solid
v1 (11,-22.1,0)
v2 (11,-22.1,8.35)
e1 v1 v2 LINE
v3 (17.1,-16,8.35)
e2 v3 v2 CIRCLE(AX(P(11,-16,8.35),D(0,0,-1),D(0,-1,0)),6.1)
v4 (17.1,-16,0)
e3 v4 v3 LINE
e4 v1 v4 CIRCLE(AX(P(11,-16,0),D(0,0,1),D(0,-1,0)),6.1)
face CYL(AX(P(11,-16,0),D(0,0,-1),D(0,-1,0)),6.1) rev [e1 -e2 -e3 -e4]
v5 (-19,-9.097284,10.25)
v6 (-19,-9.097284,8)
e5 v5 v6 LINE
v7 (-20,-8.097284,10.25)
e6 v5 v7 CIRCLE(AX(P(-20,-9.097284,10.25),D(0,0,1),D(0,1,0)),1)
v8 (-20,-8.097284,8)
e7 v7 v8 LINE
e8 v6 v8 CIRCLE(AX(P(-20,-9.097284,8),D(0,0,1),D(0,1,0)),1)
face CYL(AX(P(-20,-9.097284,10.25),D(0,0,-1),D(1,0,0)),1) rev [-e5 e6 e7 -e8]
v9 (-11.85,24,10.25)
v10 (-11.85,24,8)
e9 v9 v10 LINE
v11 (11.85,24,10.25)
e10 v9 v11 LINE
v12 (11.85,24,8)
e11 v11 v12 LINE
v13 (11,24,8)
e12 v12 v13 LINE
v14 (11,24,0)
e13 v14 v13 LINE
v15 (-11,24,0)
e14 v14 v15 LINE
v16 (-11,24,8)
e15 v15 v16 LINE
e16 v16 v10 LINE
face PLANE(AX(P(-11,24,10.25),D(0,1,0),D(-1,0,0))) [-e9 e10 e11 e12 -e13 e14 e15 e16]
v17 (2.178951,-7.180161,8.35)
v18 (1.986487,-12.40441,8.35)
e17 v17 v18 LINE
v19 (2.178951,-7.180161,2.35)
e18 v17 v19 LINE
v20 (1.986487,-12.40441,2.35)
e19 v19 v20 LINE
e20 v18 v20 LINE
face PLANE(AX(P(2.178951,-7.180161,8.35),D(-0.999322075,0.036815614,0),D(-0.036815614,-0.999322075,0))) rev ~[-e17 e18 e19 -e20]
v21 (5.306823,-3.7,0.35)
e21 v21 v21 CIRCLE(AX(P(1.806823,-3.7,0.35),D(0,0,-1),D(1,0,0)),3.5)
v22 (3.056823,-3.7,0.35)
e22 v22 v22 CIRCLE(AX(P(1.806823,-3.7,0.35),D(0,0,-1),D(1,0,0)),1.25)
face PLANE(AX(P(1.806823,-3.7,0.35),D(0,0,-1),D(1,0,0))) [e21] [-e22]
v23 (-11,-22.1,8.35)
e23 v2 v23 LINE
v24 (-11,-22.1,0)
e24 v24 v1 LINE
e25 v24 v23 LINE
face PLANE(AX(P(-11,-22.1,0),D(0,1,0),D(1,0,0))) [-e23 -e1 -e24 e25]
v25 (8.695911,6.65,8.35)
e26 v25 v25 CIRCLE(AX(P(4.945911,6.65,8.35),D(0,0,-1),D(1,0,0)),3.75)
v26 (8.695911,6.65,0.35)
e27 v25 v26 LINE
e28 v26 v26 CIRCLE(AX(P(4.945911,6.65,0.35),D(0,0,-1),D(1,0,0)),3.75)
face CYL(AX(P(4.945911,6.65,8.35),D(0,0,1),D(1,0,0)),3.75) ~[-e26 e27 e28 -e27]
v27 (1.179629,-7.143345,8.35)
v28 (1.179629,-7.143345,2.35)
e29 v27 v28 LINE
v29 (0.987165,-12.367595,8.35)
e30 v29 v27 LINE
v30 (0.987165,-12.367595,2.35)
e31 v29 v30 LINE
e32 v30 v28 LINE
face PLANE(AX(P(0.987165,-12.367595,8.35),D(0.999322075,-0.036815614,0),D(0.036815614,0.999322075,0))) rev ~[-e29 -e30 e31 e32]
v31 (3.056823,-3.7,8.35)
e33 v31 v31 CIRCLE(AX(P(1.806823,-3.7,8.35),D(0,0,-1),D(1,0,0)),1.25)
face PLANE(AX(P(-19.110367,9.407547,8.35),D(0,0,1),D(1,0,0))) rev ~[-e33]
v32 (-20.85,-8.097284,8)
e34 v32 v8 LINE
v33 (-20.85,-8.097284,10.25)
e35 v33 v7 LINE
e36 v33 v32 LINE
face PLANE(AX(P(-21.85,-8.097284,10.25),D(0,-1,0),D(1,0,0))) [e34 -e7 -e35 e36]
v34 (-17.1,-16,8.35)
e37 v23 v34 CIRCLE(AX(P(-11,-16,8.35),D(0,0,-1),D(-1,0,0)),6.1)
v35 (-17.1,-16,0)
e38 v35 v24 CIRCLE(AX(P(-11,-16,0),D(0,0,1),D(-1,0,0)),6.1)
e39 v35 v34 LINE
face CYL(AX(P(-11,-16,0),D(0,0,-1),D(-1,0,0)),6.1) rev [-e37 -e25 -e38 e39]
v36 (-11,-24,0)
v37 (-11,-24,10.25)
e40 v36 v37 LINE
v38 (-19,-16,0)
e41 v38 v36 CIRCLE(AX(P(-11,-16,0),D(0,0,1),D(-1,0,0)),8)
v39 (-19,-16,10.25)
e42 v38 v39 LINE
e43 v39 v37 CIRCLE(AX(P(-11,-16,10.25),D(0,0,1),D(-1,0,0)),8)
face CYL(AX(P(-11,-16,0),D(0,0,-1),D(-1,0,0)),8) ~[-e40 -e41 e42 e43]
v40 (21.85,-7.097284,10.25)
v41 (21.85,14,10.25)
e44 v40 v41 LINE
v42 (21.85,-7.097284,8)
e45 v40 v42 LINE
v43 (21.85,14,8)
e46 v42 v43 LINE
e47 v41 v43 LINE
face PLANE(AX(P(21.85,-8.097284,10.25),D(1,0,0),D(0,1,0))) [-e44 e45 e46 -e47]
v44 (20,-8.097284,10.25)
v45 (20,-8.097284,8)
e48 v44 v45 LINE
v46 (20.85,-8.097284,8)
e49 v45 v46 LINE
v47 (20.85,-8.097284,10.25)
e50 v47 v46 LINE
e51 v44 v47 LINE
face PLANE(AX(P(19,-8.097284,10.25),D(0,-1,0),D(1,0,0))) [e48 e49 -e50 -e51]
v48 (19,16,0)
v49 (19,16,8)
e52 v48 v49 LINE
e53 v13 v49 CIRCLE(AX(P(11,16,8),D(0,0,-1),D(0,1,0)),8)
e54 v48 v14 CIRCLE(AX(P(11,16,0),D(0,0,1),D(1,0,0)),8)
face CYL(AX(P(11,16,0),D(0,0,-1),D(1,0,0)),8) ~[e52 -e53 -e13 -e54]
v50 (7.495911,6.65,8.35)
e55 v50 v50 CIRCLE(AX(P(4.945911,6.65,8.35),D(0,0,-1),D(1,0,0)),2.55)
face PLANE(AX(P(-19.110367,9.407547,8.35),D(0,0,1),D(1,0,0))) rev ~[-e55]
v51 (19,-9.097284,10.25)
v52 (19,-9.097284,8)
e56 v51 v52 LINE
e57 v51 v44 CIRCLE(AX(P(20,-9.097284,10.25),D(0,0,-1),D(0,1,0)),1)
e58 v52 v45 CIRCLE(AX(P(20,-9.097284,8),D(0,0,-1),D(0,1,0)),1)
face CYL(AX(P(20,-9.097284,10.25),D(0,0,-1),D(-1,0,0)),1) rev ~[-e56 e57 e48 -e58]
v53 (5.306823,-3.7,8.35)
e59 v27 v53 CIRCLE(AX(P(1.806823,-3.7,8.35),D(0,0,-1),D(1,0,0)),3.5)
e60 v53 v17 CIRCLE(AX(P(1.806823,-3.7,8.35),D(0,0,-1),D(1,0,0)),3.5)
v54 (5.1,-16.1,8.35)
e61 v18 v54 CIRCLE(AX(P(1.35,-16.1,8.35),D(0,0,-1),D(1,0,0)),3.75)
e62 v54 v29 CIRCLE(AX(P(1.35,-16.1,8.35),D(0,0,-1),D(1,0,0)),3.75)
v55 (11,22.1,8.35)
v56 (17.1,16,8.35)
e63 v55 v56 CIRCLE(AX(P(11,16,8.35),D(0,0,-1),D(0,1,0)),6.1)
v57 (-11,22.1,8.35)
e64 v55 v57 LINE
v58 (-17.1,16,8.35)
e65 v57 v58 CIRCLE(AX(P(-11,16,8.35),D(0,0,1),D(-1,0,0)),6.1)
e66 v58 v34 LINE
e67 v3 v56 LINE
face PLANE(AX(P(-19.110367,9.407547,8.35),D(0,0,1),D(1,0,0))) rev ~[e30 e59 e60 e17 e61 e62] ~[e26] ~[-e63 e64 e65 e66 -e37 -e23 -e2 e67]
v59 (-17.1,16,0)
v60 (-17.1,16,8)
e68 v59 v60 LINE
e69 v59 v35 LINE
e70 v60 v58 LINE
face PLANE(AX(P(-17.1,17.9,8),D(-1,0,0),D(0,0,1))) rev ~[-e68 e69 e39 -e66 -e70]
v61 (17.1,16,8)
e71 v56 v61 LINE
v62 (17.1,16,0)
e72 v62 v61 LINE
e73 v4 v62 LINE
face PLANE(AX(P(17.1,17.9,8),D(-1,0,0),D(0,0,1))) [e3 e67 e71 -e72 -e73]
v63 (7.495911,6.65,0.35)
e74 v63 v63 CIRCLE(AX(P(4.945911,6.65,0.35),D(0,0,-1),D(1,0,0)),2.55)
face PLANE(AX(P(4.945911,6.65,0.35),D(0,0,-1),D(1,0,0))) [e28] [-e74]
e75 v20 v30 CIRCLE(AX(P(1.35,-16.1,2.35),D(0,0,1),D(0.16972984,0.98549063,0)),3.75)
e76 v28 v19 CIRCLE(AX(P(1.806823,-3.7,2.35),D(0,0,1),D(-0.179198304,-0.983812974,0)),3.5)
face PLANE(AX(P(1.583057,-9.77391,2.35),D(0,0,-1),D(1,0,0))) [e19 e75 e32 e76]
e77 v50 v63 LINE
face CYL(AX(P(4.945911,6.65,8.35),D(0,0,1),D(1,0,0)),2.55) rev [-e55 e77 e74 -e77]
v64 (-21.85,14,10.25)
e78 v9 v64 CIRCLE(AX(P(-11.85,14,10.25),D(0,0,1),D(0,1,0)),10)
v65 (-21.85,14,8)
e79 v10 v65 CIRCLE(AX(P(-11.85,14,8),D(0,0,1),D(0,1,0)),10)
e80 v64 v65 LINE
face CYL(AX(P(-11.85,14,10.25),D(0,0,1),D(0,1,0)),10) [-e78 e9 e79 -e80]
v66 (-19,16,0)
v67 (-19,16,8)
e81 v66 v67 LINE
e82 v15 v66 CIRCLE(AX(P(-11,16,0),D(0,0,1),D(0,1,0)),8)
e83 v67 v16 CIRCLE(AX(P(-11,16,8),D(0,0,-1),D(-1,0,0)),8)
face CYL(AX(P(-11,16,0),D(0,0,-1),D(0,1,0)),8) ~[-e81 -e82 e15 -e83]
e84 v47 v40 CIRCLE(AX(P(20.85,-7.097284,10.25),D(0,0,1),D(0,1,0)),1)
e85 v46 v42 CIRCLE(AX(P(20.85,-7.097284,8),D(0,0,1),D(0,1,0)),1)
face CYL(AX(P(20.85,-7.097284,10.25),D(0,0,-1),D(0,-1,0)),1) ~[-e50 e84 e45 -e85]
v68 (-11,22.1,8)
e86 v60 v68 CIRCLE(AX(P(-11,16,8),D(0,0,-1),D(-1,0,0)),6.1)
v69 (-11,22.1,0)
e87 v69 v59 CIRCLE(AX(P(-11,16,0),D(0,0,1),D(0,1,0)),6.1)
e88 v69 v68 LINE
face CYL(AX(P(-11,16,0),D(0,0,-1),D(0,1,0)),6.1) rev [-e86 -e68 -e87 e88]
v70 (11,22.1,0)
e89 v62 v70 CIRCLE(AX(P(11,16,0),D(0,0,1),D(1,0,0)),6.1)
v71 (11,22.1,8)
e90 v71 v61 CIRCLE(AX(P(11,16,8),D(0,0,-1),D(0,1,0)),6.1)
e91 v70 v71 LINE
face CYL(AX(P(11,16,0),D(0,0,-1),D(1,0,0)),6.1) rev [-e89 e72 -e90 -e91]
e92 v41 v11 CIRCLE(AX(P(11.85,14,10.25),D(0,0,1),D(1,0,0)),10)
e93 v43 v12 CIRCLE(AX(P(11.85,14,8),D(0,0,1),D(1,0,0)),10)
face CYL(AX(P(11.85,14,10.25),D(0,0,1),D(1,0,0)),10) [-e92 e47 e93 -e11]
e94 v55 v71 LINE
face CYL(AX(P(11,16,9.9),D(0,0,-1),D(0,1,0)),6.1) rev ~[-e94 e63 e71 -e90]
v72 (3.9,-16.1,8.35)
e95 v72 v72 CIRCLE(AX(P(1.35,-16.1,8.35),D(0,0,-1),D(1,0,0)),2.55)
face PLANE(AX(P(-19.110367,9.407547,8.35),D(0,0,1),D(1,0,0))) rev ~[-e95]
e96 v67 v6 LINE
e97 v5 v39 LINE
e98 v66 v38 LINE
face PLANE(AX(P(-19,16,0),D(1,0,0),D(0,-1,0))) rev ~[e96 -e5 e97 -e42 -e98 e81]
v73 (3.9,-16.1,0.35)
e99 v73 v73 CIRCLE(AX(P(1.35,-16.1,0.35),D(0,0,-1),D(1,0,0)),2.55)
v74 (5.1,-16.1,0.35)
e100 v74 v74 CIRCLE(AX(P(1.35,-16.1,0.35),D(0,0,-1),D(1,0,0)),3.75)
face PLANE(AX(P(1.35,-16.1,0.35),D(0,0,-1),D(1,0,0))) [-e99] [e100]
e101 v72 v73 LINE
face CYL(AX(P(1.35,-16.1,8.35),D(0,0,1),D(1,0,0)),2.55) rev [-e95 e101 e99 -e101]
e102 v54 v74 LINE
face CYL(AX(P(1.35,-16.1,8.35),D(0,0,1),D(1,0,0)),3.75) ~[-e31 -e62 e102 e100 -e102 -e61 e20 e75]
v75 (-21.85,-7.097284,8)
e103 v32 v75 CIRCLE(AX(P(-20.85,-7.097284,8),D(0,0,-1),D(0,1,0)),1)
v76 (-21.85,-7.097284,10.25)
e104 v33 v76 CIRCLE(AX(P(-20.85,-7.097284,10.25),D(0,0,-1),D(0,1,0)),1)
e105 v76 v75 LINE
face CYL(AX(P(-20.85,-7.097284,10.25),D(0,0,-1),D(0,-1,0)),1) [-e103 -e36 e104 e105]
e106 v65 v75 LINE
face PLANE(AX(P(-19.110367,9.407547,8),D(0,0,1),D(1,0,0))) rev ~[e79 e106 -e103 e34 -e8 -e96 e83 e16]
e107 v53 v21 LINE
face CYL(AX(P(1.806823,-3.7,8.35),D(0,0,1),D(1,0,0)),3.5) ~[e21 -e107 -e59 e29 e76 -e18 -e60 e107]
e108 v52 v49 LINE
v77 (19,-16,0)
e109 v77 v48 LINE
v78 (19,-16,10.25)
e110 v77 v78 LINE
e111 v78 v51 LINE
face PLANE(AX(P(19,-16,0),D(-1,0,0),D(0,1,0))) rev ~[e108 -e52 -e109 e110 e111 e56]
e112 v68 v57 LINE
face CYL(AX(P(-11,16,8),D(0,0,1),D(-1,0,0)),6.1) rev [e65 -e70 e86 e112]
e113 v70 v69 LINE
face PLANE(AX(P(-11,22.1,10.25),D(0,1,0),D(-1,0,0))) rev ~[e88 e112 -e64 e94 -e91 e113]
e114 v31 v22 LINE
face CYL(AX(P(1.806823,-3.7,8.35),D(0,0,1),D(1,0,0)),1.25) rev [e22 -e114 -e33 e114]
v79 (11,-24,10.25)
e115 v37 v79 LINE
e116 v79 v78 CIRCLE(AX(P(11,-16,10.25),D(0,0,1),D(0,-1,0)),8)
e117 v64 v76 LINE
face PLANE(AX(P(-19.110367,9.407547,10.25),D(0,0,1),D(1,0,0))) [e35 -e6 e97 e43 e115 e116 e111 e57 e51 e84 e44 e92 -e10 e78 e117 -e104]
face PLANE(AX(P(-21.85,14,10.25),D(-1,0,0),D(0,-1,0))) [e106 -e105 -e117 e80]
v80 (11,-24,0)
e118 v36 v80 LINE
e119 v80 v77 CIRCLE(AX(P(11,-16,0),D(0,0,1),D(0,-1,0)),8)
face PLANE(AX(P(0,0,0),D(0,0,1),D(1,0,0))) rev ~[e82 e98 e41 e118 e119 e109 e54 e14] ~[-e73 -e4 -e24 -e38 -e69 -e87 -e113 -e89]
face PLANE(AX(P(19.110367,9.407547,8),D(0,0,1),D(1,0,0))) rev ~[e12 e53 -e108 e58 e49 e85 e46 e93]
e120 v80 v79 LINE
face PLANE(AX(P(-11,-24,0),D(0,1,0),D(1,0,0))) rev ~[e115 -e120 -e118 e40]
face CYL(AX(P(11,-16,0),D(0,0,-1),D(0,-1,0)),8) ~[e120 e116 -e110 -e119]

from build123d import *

# Parameters (mm, degrees)
F1_DEPTH     = 10.25
F3_DEPTH     = 2.25
F4_R         = 1
F5_T         = 1.9
F5_T3_DEPTH  = 4.8
F5_T5_DEPTH  = 27.8972844735
F5_T8_ANGLE  = 90.000000001
F5_T10_ANGLE = 90.000000001
F6_R         = 3.75
F6_R_2       = 2.55
F7_DEPTH     = 8
F8_R         = 3.5
F8_R_2       = 1.25
F9_DEPTH     = 8
F10_R        = 3.75
F10_R_2      = 2.55
F11_DEPTH    = 8
F13_DEPTH    = 6


# Not quite as in the source:
# - a shell that OpenCascade refuses in one call is made with other operations: the cavity is built on its own and cut out


with BuildPart() as f1:
    # F0 (on Top) → F1 (new body)
    with BuildSketch(Plane.XY):
        with BuildLine():
            Line((11, 24), (-11, 24))
            ThreePointArc((-11, 24), (-16.6568542495, 21.6568542495), (-19, 16))
            Line((-19, 16), (-19, -16))
            ThreePointArc((-19, -16), (-16.6568542495, -21.6568542495), (-11, -24))
            Line((-11, -24), (11, -24))
            ThreePointArc((11, -24), (16.6568542495, -21.6568542495), (19, -16))
            Line((19, -16), (19, 16))
            ThreePointArc((19, 16), (16.6568542495, 21.6568542495), (11, 24))
        make_face()
    extrude(amount=F1_DEPTH)

    # F2 (on face) → F3 (join)
    with BuildSketch(Plane.XY.offset(10.25)):
        with BuildLine():
            ThreePointArc((-19, 16), (-16.6568542495, 21.6568542495), (-11, 24))
            Line((-11, 24), (-11.85, 24))
            ThreePointArc((-11.85, 24), (-18.9210678119, 21.0710678119), (-21.85, 14))
            Line((-21.85, 14), (-21.85, -8.0972844735))
            Line((-21.85, -8.0972844735), (-19, -8.0972844735))
            Line((-19, -8.0972844735), (-19, 16))
        make_face()
        with BuildLine():
            Line((21.85, -5.7972865179), (21.85, 14))
            ThreePointArc((21.85, 14), (18.9210678119, 21.0710678119), (11.85, 24))
            Line((11.85, 24), (11, 24))
            ThreePointArc((11, 24), (16.6568542495, 21.6568542495), (19, 16))
            Line((19, 16), (19, -8.0972844735))
            Line((19, -8.0972844735), (21.85, -8.0972844735))
            Line((21.85, -8.0972844735), (21.85, -5.7972865179))
        make_face()
    extrude(amount=-F3_DEPTH)

    # F4
    f4_edges = [f1.edges().sort_by_distance(p)[0] for p in [
        (21.85, -8.097284, 9.125),
        (19, -8.097284, 9.125),
        (-21.85, -8.097284, 9.125),
        (-19, -8.097284, 9.125),
    ]]
    fillet(f4_edges, radius=F4_R)

    # F5: shell of thickness 1.9, made by hand


with BuildPart() as f5_core1:
    # F5_t2: copy of F1
    add(f1.part)

    # the walls: a layer under each face that stays
    f5_faces = [f5_core1.faces().sort_by_distance(p)[0] for p in [
        (19, 0, 5.125),
        (0, 0, 10.25),
        (19.2928932188, -8.3901776923, 9.125),
        (16.6568542495, -21.6568542495, 5.125),
        (20.0416666667, -3.5810703946, 8),
        (16.6568542495, 21.6568542495, 4),
        (-21.85, 3.4513577633, 9.125),
        (-18.9210678119, 21.0710678119, 9.125),
        (-20.425, -8.0972844735, 9.125),
        (0, 24, 5.125),
        (-19.2928932188, -8.3901776923, 9.125),
        (18.9210678119, 21.0710678119, 9.125),
        (-19, 0, 5.125),
        (21.85, 3.4513577633, 9.125),
        (-16.6568542495, -21.6568542495, 5.125),
        (0, -24, 5.125),
        (20.425, -8.0972844735, 9.125),
        (-16.6568542495, 21.6568542495, 4),
        (-20.0416666667, -3.5810703946, 8),
    ]]
    thicken(f5_faces, amount=-F5_T, mode=Mode.SUBTRACT)

    # F5_s4 → F5_t3 (cut)
    with BuildSketch(Plane.XZ.offset(6.1972844735)):
        Polygon((19.019, 7.981), (17.1, 8), (17.1, 9.9), (19, 9.9), align=None)
        Polygon((-19.019, 7.981), (-17.1, 8), (-17.1, 9.9), (-19, 9.9), align=None)
    extrude(amount=F5_T3_DEPTH, mode=Mode.SUBTRACT)

    # F5_s6 → F5_t5 (cut)
    with BuildSketch(Plane.XZ.offset(-17.9)):
        Polygon((19.019, 7.981), (17.1, 8), (17.1, 9.9), (19, 9.9), align=None)
        Polygon((-19.019, 7.981), (-17.1, 8), (-17.1, 9.9), (-19, 9.9), align=None)
    extrude(amount=F5_T5_DEPTH, mode=Mode.SUBTRACT)

    # F5_s7 → F5_t8 (revolve, cut)
    with BuildSketch(Plane.YZ.offset(11)):
        Polygon((24.019, 7.981), (24, 9.9), (22.1, 9.9), (22.1, 8), align=None)
    revolve(axis=Axis((11, 16, 8), (0, 0, -1)), revolution_arc=F5_T8_ANGLE, mode=Mode.SUBTRACT)

    # F5_s9 → F5_t10 (revolve, cut)
    with BuildSketch(Plane.XZ.offset(-16)):
        Polygon((-19.019, 7.981), (-17.1, 8), (-17.1, 9.9), (-19, 9.9), align=None)
    revolve(axis=Axis((-11, 16, 8), (0, 0, -1)), revolution_arc=F5_T10_ANGLE, mode=Mode.SUBTRACT)


with BuildPart() as f1_1:
    add(f1.part)

    # what is left inside the walls is the cavity
    f5_cavity = [f5_core1.part.solids().sort_by_distance(p)[0] for p in [
        (0, -7.366667, 0.019),
    ]]
    add(f5_cavity, mode=Mode.SUBTRACT)

    # F6 (on face) → F7 (join)
    with BuildSketch(Plane(origin=(0, 0, 8.35), x_dir=(1, 0, 0), z_dir=(0, 0, -1))):
        with Locations((1.35, 16.1)):
            Circle(F6_R)
        with Locations((1.35, 16.1)):
            Circle(F6_R_2, mode=Mode.SUBTRACT)
    extrude(amount=F7_DEPTH)

    # F8 (on face) → F9 (join)
    with BuildSketch(Plane(origin=(0, 0, 8.35), x_dir=(1, 0, 0), z_dir=(0, 0, -1))):
        with Locations((1.8068233039, 3.7)):
            Circle(F8_R)
        with Locations((1.8068233039, 3.7)):
            Circle(F8_R_2, mode=Mode.SUBTRACT)
    extrude(amount=F9_DEPTH)

    # F10 (on face) → F11 (join)
    with BuildSketch(Plane(origin=(0, 0, 8.35), x_dir=(1, 0, 0), z_dir=(0, 0, -1))):
        with Locations((4.9459114671, -6.65)):
            Circle(F10_R)
        with Locations((4.9459114671, -6.65)):
            Circle(F10_R_2, mode=Mode.SUBTRACT)
    extrude(amount=F11_DEPTH)

    # F12 (on face) → F13 (join)
    with BuildSketch(Plane(origin=(0, 0, 8.35), x_dir=(1, 0, 0), z_dir=(0, 0, -1))):
        with BuildLine():
            ThreePointArc((1.9864868995, 12.4044101382), (1.4880585521, 12.3525422169), (0.987164824, 12.3675945243))
            Line((0.987164824, 12.3675945243), (1.1796292386, 7.1433454088))
            ThreePointArc((1.1796292386, 7.1433454088), (1.6779686553, 7.1976272642), (2.1789513141, 7.1801610227))
            Line((2.1789513141, 7.1801610227), (1.9864868995, 12.4044101382))
        make_face()
    extrude(amount=F13_DEPTH)


solid = f1_1.part
